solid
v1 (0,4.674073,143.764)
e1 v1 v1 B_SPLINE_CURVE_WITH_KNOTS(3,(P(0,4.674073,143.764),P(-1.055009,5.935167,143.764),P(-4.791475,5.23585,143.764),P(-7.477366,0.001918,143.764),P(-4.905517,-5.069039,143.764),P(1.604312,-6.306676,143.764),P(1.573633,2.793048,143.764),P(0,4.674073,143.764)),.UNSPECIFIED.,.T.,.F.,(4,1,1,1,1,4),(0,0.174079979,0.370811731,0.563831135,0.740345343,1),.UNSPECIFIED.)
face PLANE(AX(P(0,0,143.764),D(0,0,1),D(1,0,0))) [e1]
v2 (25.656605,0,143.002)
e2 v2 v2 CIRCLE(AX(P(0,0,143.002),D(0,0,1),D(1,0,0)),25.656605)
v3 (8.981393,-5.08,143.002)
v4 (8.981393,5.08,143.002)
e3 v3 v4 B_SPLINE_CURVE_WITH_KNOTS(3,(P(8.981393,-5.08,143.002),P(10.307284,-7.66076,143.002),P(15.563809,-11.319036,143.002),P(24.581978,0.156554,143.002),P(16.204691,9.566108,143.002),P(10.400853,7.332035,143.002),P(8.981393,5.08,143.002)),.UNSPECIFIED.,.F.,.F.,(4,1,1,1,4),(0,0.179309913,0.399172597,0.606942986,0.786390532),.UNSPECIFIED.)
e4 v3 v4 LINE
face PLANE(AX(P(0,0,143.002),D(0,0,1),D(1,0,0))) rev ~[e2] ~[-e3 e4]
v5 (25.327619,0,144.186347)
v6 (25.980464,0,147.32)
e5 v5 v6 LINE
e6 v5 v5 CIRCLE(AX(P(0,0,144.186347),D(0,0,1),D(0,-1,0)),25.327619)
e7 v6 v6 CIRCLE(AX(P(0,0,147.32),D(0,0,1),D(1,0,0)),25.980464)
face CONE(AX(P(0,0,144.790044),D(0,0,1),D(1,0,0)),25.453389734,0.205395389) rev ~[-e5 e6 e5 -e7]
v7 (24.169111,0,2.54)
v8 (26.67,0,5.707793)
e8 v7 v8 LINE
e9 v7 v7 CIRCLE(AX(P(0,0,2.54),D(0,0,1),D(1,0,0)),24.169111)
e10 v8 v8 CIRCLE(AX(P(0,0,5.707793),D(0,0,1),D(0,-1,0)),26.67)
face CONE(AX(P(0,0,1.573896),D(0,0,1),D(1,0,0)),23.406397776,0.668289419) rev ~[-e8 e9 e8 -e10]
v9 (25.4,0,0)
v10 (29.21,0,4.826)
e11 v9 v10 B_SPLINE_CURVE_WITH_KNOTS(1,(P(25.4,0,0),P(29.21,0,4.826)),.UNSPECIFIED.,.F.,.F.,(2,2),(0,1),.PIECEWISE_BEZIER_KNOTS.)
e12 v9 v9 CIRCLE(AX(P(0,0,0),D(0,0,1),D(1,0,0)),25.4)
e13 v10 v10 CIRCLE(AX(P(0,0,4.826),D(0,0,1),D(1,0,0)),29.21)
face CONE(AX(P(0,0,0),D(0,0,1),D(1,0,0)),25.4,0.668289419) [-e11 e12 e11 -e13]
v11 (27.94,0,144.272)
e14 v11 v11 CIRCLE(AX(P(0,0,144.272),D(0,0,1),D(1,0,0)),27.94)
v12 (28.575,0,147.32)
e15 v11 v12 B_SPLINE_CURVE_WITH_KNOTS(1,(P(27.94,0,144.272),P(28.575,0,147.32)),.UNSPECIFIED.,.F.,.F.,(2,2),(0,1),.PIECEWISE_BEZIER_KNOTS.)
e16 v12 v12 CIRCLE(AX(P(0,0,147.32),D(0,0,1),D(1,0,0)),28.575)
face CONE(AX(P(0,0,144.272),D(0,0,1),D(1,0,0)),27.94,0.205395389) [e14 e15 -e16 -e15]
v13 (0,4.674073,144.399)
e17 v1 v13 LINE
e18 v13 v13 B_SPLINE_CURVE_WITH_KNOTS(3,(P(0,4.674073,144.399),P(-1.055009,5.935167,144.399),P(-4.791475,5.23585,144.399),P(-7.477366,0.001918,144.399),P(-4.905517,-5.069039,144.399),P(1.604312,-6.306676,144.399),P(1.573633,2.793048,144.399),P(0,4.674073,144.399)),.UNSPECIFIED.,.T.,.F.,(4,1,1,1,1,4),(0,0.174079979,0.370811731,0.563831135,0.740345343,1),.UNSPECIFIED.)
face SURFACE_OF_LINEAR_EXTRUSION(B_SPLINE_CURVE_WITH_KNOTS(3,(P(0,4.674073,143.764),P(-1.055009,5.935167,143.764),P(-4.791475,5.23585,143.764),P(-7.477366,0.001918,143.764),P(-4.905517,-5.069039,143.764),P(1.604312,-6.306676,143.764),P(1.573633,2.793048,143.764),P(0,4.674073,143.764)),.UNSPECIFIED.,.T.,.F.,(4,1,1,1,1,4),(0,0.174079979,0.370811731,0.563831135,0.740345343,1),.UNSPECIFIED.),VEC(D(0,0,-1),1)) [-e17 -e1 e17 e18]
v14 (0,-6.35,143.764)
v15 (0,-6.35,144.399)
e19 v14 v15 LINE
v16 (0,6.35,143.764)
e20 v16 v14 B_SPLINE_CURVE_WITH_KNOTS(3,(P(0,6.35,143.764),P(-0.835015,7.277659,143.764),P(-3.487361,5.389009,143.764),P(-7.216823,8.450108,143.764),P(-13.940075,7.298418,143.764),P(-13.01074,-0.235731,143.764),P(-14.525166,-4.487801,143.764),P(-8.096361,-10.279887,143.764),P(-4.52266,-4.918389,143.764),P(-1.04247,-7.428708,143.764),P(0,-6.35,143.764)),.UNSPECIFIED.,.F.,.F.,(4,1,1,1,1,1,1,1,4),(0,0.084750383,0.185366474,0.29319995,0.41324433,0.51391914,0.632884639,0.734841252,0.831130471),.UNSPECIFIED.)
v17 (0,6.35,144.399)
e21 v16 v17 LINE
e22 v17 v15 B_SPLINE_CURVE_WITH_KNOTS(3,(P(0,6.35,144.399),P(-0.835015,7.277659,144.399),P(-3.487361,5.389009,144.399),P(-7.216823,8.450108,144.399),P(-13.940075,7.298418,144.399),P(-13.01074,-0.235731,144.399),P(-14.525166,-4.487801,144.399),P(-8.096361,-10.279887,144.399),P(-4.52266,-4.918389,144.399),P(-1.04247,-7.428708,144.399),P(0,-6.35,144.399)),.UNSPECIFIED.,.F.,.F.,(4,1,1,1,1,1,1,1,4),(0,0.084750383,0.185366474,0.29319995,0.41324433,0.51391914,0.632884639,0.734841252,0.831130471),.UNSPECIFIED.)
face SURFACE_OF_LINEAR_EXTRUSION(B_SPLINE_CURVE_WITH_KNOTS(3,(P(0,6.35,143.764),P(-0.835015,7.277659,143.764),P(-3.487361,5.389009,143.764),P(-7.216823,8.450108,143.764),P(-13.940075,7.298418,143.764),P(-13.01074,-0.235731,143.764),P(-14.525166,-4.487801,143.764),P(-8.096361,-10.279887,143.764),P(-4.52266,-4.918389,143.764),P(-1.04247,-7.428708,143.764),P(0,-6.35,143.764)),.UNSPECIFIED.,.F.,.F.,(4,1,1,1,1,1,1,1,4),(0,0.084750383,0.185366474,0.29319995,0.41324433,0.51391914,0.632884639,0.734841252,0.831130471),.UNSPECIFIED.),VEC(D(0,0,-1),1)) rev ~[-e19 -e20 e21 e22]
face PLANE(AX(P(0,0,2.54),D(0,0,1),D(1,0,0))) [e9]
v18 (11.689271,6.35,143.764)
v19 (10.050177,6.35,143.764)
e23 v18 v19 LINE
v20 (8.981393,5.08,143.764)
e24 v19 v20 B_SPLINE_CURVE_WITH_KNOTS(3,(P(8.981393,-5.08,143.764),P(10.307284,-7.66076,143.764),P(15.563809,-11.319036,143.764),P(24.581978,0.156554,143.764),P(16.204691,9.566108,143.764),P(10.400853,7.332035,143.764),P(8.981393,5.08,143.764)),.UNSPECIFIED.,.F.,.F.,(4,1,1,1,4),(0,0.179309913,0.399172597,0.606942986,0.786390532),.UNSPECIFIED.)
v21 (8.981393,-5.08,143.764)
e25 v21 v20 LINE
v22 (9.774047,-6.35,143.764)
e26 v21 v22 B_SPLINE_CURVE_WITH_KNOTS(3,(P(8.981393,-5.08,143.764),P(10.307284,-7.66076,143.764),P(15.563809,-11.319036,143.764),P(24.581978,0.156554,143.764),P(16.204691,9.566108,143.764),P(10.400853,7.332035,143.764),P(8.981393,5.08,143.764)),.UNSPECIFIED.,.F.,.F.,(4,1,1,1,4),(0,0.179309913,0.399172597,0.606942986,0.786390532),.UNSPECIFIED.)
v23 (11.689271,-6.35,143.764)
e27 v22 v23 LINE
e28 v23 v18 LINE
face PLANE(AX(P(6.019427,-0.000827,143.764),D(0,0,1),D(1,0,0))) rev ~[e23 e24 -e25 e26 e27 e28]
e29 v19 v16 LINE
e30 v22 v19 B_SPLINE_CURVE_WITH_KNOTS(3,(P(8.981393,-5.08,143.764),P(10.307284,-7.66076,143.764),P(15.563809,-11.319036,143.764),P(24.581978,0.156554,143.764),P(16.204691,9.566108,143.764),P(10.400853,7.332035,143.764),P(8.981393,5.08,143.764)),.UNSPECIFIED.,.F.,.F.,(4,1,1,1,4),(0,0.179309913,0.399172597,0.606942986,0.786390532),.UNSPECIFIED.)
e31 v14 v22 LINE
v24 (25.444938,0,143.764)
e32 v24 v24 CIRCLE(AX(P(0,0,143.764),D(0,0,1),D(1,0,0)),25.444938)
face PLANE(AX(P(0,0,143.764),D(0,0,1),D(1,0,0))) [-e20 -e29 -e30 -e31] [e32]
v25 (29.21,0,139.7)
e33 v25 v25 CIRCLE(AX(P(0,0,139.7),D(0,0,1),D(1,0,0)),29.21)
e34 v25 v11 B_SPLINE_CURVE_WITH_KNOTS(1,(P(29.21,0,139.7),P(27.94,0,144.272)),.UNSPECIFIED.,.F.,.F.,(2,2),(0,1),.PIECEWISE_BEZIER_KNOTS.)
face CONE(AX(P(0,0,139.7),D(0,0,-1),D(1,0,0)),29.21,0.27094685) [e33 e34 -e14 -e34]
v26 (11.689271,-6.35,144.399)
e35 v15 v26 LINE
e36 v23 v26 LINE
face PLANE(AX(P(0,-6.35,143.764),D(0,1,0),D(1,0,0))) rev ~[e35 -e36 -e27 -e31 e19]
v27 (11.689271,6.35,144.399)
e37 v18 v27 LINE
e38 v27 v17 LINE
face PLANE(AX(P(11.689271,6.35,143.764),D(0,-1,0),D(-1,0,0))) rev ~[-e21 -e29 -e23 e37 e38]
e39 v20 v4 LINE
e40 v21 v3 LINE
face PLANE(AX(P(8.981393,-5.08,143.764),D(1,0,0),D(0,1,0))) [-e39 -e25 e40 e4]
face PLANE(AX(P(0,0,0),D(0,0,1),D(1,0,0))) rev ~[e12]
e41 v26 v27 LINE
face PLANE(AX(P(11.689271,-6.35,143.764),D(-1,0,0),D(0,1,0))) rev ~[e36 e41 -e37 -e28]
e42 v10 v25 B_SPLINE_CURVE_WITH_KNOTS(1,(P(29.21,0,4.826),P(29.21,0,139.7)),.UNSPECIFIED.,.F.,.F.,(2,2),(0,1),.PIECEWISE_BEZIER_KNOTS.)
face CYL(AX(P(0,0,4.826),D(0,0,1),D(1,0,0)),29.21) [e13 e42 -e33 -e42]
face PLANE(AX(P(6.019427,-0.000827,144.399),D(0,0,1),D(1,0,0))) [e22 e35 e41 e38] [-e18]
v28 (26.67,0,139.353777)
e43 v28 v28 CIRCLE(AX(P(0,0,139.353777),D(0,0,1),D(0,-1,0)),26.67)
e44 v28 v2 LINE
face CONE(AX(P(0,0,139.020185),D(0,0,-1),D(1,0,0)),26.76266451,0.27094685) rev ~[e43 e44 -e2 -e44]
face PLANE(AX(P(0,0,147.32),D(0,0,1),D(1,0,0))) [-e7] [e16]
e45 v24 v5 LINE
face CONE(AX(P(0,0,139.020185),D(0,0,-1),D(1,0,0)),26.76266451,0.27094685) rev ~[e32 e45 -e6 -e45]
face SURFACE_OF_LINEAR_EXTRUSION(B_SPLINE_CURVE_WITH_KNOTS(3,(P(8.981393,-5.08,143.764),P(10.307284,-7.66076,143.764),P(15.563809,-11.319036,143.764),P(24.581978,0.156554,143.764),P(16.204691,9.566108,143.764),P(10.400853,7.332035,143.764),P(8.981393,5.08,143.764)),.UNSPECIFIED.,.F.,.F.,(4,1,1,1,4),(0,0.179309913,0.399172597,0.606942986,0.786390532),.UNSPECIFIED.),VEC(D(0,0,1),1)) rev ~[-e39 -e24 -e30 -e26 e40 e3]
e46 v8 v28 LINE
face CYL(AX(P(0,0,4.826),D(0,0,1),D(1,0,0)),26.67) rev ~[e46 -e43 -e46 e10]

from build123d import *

# Parameters (mm, degrees)
F2_R      = 29.21
F4_R      = 29.21
F0_R      = 25.4
F8_R      = 27.94
F11_R     = 28.575
F13_T     = -2.54
F15_R     = 27.94
F16_DEPTH = 0.762
F18_DEPTH = 0.635


with BuildPart() as f5:
    # F2 (on offset) → F5 section 0
    with BuildSketch(Plane.XY.offset(4.826)):
        Circle(F2_R)
    # F4 (on offset) → F5 section 1
    with BuildSketch(Plane.XY.offset(139.7)):
        Circle(F4_R)
    loft()

    # F0 (on Top) → F6 section 0
    with BuildSketch(Plane.XY):
        Circle(F0_R)
    # F2 (on offset) → F6 section 1
    with BuildSketch(Plane.XY.offset(4.826)):
        Circle(F2_R)
    loft()

    # F4 (on offset) → F9 section 0
    with BuildSketch(Plane.XY.offset(139.7)):
        Circle(F4_R)
    # F8 (on offset) → F9 section 1
    with BuildSketch(Plane.XY.offset(144.272)):
        Circle(F8_R)
    loft()

    # F8 (on offset) → F12 section 0
    with BuildSketch(Plane.XY.offset(144.272)):
        Circle(F8_R)
    # F11 (on offset) → F12 section 1
    with BuildSketch(Plane.XY.offset(147.32)):
        Circle(F11_R)
    loft()

    # F13
    f13_openings = [f5.faces().sort_by_distance(p)[0] for p in [
        (0, 0, 147.32),
    ]]
    offset(amount=F13_T, openings=f13_openings, kind=Kind.INTERSECTION)

    # F15 (on offset) → F16 (join)
    with BuildSketch(Plane.XY.offset(143.764)):
        Circle(F15_R)
        with BuildLine():
            add(Edge.make_bspline(
                [(8.9813927189, -5.08), (10.307283956, -7.660759653), (15.5638091176, -11.3190362963), (24.5819782778, 0.156554303), (16.2046906326, 9.5661078257), (10.4008527308, 7.3320350733), (8.9813927189, 5.08)],
                knots=[0, 0, 0, 0, 0.1793099128, 0.3991725973, 0.6069429862, 0.7863905321, 0.7863905321, 0.7863905321, 0.7863905321], degree=3))
            add(Edge.make_bspline(
                [(8.9813927189, 5.08), (7.2917062072, 2.3992388266), (7.4018764658, -2.0055760179), (8.9813927189, -5.08)],
                knots=[0.7863905321, 0.7863905321, 0.7863905321, 0.7863905321, 1, 1, 1, 1], degree=3))
        make_face(mode=Mode.SUBTRACT)
        with BuildLine():
            add(Edge.make_bspline(
                [(8.9813927189, 5.08), (7.2917062072, 2.3992388266), (7.4018764658, -2.0055760179), (8.9813927189, -5.08)],
                knots=[0.7863905321, 0.7863905321, 0.7863905321, 0.7863905321, 1, 1, 1, 1], degree=3))
            Line((8.9813927189, -5.08), (8.9813927189, 0))
            Line((8.9813927189, 0), (8.9813927189, 5.08))
        make_face()
    extrude(amount=-F16_DEPTH)

    # F17 (on offset) → F18 (join)
    with BuildSketch(Plane.XY.offset(143.764)):
        with BuildLine():
            Line((11.6892714785, -6.35), (11.6892714785, 0))
            Line((11.6892714785, 0), (11.6892714785, 6.35))
            Line((11.6892714785, 6.35), (0, 6.35))
            add(Edge.make_bspline(
                [(0, -6.35), (1.8282559625, -4.4581892492), (1.6638111749, 4.50159086), (0, 6.35)],
                knots=[0.8311304713, 0.8311304713, 0.8311304713, 0.8311304713, 1, 1, 1, 1], degree=3))
            Line((0, -6.35), (11.6892714785, -6.35))
        make_face()
        with BuildLine():
            add(Edge.make_bspline(
                [(0, -6.35), (1.8282559625, -4.4581892492), (1.6638111749, 4.50159086), (0, 6.35)],
                knots=[0.8311304713, 0.8311304713, 0.8311304713, 0.8311304713, 1, 1, 1, 1], degree=3))
            add(Edge.make_bspline(
                [(0, 6.35), (-0.8350152674, 7.2776592654), (-3.4873611567, 5.389008621), (-7.2168226702, 8.4501082119), (-13.9400747086, 7.2984183342), (-13.0107401815, -0.2357314092), (-14.5251656567, -4.4878007238), (-8.0963607859, -10.2798866877), (-4.5226600604, -4.9183886243), (-1.0424695397, -7.4287084101), (0, -6.35)],
                knots=[0, 0, 0, 0, 0.0847503832, 0.1853664744, 0.2931999501, 0.4132443298, 0.5139191398, 0.6328846388, 0.7348412518, 0.8311304713, 0.8311304713, 0.8311304713, 0.8311304713], degree=3))
        make_face()
        with BuildLine():
            add(Edge.make_bspline(
                [(0, 4.6740733087), (-1.0550088408, 5.935167024), (-4.791474758, 5.2358502182), (-7.4773661307, 0.0019184091), (-4.9055168376, -5.0690387184), (1.6043119196, -6.306676079), (1.5736327616, 2.7930479473), (0, 4.6740733087)],
                knots=[0, 0, 0, 0, 0.1740799793, 0.3708117314, 0.5638311353, 0.7403453431, 1, 1, 1, 1], degree=3))
        make_face(mode=Mode.SUBTRACT)
    extrude(amount=F18_DEPTH)


solid = f5.part
